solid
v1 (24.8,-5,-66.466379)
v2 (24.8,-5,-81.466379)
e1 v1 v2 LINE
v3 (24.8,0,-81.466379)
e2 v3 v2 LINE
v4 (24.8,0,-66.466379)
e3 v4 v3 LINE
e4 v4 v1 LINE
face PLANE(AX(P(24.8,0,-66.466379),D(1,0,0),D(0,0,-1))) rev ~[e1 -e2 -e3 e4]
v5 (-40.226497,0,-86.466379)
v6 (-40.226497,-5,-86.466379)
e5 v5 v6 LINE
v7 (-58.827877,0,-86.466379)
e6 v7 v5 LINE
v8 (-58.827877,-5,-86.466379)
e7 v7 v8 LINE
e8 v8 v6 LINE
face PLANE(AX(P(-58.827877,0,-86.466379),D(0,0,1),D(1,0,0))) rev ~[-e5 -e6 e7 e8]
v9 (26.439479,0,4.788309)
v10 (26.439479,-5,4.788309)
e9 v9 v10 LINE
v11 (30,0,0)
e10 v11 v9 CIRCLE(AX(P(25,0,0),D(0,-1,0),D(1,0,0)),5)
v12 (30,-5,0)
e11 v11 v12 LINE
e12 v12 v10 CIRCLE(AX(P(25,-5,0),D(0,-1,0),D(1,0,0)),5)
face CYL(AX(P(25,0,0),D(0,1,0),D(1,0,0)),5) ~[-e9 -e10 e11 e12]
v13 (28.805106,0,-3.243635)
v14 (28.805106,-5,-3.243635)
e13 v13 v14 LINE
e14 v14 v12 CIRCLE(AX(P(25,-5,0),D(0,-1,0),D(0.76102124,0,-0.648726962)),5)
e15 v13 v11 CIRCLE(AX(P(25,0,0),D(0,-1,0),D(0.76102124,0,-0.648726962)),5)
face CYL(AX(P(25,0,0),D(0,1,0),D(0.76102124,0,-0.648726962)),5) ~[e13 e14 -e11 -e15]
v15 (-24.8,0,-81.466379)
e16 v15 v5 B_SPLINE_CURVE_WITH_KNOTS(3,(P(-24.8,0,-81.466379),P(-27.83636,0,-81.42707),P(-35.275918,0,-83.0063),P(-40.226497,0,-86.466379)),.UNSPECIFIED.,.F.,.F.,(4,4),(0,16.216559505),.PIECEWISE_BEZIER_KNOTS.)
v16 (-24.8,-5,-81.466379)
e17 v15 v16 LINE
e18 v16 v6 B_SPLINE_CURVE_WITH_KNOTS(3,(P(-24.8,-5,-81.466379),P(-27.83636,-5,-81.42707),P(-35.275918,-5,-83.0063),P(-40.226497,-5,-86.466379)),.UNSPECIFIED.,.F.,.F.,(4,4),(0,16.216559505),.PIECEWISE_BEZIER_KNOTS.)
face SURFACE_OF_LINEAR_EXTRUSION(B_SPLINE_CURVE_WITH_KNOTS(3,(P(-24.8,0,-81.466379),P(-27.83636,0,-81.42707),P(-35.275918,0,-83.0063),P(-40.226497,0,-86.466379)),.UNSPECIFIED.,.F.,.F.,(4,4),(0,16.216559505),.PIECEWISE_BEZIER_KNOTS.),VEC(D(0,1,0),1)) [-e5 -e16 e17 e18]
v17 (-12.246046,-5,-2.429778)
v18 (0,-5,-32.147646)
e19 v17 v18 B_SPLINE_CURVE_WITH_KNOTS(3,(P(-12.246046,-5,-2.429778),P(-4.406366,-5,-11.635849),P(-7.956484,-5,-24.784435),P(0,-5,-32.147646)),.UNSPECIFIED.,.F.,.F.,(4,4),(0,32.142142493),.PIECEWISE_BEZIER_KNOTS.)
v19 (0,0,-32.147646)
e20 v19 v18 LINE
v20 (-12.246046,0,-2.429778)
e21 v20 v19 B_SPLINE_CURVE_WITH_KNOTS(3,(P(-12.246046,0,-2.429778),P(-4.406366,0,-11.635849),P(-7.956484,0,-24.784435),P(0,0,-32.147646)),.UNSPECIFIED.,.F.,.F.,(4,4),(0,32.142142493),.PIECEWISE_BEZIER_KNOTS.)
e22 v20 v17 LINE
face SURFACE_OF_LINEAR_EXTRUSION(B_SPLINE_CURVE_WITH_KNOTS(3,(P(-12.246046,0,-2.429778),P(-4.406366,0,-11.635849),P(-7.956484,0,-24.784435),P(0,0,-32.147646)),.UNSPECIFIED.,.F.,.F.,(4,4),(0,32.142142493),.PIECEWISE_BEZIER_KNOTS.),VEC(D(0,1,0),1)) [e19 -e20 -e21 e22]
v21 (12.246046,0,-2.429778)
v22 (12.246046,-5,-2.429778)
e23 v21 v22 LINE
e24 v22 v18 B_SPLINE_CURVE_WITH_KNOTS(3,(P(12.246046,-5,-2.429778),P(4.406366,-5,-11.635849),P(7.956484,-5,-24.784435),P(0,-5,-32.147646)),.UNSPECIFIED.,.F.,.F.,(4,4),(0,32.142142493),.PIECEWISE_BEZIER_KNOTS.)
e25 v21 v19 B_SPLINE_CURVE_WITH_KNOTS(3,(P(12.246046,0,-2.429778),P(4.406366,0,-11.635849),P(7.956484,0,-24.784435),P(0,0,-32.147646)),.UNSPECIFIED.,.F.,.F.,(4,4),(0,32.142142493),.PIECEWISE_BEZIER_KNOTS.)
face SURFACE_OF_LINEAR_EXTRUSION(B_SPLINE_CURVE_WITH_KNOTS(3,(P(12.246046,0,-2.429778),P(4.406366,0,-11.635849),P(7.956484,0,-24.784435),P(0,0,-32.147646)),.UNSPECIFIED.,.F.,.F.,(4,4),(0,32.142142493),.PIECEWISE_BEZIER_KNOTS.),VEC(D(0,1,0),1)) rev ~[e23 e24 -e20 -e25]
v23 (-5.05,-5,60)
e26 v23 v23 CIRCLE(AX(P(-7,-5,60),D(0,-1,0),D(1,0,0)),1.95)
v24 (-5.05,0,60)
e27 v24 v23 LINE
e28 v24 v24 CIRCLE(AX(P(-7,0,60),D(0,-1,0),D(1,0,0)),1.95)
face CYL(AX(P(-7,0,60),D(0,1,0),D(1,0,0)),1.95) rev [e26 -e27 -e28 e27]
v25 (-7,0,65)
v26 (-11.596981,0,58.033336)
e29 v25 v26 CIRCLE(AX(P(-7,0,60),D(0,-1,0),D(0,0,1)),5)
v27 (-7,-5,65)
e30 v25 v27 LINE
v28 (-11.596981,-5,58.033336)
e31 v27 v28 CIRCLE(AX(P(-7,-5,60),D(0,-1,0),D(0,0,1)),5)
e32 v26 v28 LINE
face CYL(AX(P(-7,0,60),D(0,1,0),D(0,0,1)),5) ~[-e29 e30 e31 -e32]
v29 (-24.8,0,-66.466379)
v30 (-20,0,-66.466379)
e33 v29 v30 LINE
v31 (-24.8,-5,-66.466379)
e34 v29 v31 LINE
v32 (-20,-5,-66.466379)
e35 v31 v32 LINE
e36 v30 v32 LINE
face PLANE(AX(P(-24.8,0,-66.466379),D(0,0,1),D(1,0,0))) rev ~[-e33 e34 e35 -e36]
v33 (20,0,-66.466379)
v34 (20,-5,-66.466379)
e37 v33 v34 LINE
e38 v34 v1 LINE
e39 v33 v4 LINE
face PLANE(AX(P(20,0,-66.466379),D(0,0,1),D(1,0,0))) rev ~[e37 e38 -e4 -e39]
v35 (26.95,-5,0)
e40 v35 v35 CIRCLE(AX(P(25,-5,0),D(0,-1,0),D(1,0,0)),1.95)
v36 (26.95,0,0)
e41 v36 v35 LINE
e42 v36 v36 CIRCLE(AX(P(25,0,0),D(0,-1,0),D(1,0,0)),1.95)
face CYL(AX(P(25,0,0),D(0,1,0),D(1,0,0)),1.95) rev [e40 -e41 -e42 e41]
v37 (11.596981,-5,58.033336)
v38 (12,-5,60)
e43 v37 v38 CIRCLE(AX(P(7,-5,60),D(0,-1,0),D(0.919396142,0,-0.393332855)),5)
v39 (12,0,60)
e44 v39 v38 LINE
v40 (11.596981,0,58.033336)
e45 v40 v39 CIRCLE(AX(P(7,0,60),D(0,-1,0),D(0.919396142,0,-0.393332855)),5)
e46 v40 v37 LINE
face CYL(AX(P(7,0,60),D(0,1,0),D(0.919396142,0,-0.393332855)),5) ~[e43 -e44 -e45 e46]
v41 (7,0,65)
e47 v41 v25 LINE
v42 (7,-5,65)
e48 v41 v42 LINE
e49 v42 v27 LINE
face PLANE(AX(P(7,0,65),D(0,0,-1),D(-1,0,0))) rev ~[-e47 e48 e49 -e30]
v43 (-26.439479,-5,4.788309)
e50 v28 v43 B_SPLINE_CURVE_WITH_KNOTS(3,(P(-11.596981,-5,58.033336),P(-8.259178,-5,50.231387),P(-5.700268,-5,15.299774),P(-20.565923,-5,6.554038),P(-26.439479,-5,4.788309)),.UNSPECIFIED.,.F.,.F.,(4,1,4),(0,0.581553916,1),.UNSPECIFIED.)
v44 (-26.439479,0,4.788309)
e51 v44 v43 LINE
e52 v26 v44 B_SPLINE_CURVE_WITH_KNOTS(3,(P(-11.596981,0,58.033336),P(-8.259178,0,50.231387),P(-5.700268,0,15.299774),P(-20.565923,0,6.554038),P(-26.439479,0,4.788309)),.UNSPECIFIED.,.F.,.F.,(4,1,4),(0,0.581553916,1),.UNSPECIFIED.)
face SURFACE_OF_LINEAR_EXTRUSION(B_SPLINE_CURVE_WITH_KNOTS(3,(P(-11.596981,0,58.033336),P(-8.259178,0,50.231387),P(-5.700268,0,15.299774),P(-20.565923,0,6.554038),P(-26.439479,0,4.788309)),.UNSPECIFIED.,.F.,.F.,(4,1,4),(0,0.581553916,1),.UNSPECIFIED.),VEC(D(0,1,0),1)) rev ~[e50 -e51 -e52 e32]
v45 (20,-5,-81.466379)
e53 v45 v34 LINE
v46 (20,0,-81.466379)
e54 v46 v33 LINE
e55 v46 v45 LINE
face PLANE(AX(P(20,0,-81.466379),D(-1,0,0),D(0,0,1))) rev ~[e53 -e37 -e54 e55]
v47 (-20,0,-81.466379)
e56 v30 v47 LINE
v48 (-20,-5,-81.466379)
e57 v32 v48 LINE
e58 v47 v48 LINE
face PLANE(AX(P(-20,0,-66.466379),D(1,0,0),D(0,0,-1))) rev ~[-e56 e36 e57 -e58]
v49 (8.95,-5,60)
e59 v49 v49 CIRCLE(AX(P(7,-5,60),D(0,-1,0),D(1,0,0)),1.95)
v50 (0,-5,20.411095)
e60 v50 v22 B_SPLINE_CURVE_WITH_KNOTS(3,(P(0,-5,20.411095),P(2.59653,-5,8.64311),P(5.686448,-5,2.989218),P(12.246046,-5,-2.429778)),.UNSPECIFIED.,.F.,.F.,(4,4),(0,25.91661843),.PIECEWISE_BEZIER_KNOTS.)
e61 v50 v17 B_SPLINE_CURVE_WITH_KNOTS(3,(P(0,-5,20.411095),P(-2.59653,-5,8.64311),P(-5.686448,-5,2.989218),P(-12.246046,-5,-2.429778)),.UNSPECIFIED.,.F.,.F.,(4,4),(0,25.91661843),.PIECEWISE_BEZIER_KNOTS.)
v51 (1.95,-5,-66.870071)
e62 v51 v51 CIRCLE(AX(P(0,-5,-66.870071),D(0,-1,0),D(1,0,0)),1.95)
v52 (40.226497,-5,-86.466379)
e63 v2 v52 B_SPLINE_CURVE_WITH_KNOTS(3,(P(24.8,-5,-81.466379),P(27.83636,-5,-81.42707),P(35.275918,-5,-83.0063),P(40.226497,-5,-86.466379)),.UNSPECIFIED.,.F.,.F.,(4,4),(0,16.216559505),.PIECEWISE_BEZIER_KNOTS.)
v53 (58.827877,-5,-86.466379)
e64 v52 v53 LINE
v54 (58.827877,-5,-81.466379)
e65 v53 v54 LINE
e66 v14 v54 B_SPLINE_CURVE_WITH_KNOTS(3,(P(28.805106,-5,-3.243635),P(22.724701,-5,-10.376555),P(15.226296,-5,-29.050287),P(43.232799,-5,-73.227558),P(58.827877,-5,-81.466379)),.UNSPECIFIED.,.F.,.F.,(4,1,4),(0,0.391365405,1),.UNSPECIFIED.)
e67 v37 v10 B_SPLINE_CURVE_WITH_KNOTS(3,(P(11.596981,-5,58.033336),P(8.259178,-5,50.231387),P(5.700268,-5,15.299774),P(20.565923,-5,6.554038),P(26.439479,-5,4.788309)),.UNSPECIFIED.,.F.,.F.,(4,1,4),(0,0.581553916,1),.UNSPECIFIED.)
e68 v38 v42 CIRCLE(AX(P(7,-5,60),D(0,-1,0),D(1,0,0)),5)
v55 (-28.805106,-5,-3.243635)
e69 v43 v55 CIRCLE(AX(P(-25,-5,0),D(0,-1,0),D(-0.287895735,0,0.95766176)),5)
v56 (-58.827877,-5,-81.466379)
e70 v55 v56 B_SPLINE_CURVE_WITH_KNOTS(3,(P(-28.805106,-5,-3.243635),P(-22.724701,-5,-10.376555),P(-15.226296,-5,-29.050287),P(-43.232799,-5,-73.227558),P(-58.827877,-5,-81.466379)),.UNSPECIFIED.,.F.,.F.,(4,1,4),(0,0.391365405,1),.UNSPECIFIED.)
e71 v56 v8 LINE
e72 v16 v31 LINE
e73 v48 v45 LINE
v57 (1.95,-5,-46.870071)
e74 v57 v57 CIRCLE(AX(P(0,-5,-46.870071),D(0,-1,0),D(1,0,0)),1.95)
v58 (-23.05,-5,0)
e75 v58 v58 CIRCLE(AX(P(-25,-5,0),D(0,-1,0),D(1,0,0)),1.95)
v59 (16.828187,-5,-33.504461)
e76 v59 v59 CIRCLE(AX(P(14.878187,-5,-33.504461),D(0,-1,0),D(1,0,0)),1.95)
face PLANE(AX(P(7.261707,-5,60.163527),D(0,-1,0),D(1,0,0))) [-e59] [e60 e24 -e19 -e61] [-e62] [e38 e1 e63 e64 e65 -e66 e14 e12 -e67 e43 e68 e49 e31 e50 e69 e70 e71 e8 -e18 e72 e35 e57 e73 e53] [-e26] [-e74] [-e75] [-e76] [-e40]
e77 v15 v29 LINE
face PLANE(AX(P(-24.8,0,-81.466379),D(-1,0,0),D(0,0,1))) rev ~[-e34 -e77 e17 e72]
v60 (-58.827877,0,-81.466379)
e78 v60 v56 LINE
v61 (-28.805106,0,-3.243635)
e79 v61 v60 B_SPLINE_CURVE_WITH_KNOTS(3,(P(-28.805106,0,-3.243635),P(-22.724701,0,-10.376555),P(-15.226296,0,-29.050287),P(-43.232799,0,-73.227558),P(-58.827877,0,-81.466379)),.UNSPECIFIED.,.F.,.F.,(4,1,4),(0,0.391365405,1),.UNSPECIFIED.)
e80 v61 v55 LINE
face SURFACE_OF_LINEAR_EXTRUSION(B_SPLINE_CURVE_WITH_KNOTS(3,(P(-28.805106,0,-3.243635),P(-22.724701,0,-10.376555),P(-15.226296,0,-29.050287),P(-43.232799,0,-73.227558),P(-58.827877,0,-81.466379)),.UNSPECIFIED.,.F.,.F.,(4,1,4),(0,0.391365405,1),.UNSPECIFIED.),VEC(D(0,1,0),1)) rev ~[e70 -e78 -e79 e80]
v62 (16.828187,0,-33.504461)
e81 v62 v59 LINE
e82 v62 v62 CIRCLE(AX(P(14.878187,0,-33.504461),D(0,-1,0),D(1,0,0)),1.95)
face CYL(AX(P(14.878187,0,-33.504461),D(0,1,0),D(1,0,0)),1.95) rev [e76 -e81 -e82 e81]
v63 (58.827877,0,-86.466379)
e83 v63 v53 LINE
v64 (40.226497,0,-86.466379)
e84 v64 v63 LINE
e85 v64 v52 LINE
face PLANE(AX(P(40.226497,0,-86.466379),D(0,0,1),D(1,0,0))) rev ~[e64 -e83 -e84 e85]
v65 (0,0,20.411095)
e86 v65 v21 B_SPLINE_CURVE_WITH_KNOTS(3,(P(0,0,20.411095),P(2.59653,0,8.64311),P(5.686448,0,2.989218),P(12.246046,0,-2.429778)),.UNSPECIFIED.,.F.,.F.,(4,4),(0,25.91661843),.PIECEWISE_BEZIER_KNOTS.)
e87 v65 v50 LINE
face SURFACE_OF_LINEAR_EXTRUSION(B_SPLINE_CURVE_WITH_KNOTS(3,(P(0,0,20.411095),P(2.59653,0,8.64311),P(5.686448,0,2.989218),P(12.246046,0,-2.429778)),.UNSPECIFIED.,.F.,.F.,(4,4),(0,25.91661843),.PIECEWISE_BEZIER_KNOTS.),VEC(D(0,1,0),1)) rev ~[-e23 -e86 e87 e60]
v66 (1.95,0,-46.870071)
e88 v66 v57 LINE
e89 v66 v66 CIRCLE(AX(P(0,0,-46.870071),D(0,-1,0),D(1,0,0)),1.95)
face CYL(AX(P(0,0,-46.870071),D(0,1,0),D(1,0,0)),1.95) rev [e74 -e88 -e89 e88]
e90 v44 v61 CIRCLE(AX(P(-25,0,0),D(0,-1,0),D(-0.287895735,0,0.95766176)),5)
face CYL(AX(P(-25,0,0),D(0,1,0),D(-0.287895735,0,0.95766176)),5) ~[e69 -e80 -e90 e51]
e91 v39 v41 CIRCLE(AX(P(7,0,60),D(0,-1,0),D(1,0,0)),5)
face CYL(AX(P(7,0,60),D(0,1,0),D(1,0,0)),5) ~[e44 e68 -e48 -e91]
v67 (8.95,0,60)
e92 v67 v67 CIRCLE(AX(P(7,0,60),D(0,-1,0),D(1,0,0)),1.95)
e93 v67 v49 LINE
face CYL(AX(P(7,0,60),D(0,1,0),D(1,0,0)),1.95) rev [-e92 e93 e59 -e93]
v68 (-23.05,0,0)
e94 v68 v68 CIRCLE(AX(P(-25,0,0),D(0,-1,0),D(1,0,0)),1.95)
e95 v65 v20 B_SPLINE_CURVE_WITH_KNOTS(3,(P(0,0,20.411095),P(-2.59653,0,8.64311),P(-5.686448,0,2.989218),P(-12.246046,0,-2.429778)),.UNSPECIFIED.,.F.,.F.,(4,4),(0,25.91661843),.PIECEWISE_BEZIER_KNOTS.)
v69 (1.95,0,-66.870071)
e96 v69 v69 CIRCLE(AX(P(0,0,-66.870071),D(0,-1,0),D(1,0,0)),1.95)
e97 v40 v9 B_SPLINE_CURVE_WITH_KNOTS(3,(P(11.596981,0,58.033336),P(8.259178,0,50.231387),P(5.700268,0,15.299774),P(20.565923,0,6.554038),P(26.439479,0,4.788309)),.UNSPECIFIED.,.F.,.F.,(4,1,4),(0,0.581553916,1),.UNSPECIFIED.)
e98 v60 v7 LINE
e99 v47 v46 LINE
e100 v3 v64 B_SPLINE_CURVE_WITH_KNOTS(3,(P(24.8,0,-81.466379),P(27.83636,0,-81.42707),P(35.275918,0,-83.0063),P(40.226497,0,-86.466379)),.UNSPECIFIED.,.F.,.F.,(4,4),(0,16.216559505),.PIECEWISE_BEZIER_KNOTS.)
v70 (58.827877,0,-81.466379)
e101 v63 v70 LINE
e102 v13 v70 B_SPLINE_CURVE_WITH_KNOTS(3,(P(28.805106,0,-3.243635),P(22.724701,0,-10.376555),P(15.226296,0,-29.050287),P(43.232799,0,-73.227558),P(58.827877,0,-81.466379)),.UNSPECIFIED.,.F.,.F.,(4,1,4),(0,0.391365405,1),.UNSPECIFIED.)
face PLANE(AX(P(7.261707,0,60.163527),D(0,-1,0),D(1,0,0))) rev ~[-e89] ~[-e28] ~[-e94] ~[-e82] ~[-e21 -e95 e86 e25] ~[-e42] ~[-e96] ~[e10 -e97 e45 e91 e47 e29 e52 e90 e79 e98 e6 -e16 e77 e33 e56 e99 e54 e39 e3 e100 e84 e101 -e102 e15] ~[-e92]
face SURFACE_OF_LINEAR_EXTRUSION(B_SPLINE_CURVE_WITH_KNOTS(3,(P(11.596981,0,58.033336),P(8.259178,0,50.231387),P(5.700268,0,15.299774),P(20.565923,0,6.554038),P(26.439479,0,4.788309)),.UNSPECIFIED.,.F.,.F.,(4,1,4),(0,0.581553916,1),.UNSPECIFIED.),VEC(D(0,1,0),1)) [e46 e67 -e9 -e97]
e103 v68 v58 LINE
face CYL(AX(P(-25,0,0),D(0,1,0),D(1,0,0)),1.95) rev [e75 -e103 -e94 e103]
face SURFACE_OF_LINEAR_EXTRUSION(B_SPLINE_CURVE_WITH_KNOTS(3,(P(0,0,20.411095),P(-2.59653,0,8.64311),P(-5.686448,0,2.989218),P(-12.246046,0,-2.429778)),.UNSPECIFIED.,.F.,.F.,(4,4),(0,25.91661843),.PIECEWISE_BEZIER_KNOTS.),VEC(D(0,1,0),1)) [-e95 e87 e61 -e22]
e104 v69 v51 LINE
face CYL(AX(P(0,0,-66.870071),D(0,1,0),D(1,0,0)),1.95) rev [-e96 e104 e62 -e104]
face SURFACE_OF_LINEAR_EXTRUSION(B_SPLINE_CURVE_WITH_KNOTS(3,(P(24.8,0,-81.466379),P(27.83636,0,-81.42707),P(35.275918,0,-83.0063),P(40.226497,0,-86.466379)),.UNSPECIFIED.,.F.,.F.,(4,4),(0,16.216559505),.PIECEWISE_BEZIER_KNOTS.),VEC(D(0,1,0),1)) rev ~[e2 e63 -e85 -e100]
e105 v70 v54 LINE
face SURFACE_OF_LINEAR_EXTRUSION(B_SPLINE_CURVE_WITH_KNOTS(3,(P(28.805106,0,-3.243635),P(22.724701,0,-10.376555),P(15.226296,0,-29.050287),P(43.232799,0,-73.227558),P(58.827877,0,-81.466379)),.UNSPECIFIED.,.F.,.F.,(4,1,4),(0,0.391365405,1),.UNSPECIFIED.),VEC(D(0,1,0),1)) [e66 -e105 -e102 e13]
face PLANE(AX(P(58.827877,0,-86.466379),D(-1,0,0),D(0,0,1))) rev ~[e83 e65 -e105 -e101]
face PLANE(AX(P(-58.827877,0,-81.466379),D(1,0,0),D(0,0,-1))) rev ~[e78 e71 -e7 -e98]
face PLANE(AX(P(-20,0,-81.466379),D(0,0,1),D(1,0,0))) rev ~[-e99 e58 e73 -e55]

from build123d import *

# Parameters (mm, degrees)
F0_R     = 1.95
F1_DEPTH = 5


with BuildPart() as f1:
    # F0 (on Front) → F1 (new body)
    with BuildSketch(Plane.XZ):
        with BuildLine():
            ThreePointArc((11.5969807084, 58.0333357261), (11.8982090371, 58.9962329808), (12, 60))
            ThreePointArc((12, 60), (10.5355339059, 63.5355339059), (7, 65))
            ThreePointArc((7, 65), (2.8266727082, 57.2462136402), (11.5969807084, 58.0333357261))
        make_face()
        with Locations((7, 60)):
            Circle(F0_R, mode=Mode.SUBTRACT)
        with BuildLine():
            ThreePointArc((11.5969807084, 58.0333357261), (2.8266727082, 57.2462136402), (7, 65))
            Line((7, 65), (0, 65))
            Line((0, 65), (-7, 65))
            ThreePointArc((-7, 65), (-3.4644660941, 63.5355339059), (-2, 60))
            ThreePointArc((-2, 60), (-5.9962329808, 55.1017909629), (-11.5969807084, 58.0333357261))
            add(Edge.make_bspline(
                [(-11.5969807084, 58.0333357261), (-8.259178384, 50.2313874739), (-5.7002681923, 15.299773588), (-20.5659226075, 6.5540384245), (-26.4394786751, 4.7883087979)],
                knots=[0, 0, 0, 0, 0.5815539161, 1, 1, 1, 1], degree=3))
            ThreePointArc((-26.4394786751, 4.7883087979), (-22.0164947943, 4.0123181189), (-20, 0))
            ThreePointArc((-20, 0), (-23.271638205, -4.69177637), (-28.8051062023, -3.2436348113))
            add(Edge.make_bspline(
                [(-28.8051062023, -3.2436348113), (-22.7247010924, -10.376554681), (-15.2262960098, -29.050287314), (-43.232798529, -73.227558015), (-58.8278773565, -81.4663794637)],
                knots=[0, 0, 0, 0, 0.3913654049, 1, 1, 1, 1], degree=3))
            Line((-58.8278773565, -81.4663794637), (-58.8278773565, -86.4663794637))
            Line((-58.8278773565, -86.4663794637), (-40.2264967561, -86.4663794637))
            add(Edge.make_bspline(
                [(-24.8, -81.4663794637), (-27.8363596976, -81.4270702004), (-35.2759175003, -83.0063000321), (-40.2264967561, -86.4663794637)],
                knots=[0, 0, 0, 0, 16.2165595046, 16.2165595046, 16.2165595046, 16.2165595046], degree=3))
            Line((-24.8, -81.4663794637), (-24.8, -66.4663794637))
            Line((-24.8, -66.4663794637), (-20, -66.4663794637))
            Line((-20, -66.4663794637), (-20, -81.4663794637))
            Line((-20, -81.4663794637), (0, -81.4663794637))
            Line((0, -81.4663794637), (20, -81.4663794637))
            Line((20, -81.4663794637), (20, -66.4663794637))
            Line((20, -66.4663794637), (24.8, -66.4663794637))
            Line((24.8, -66.4663794637), (24.8, -81.4663794637))
            add(Edge.make_bspline(
                [(24.8, -81.4663794637), (27.8363596976, -81.4270702004), (35.2759175003, -83.0063000321), (40.2264967561, -86.4663794637)],
                knots=[0, 0, 0, 0, 16.2165595046, 16.2165595046, 16.2165595046, 16.2165595046], degree=3))
            Line((40.2264967561, -86.4663794637), (58.8278773565, -86.4663794637))
            Line((58.8278773565, -86.4663794637), (58.8278773565, -81.4663794637))
            add(Edge.make_bspline(
                [(28.8051062023, -3.2436348113), (22.7247010924, -10.376554681), (15.2262960098, -29.050287314), (43.232798529, -73.227558015), (58.8278773565, -81.4663794637)],
                knots=[0, 0, 0, 0, 0.3913654049, 1, 1, 1, 1], degree=3))
            ThreePointArc((28.8051062023, -3.2436348113), (20.2037048496, -1.4126403755), (26.4394786751, 4.7883087979))
            add(Edge.make_bspline(
                [(11.5969807084, 58.0333357261), (8.259178384, 50.2313874739), (5.7002681923, 15.299773588), (20.5659226075, 6.5540384245), (26.4394786751, 4.7883087979)],
                knots=[0, 0, 0, 0, 0.5815539161, 1, 1, 1, 1], degree=3))
        make_face()
        with Locations((0, -66.8700714409)):
            Circle(F0_R, mode=Mode.SUBTRACT)
        with Locations((0, -46.8700714409)):
            Circle(F0_R, mode=Mode.SUBTRACT)
        with Locations((14.8781873236, -33.5044610186)):
            Circle(F0_R, mode=Mode.SUBTRACT)
        with BuildLine():
            add(Edge.make_bspline(
                [(0, 20.4110946506), (-2.5965298992, 8.6431102827), (-5.6864479557, 2.9892178718), (-12.2460462153, -2.4297779892)],
                knots=[0, 0, 0, 0, 25.9166184302, 25.9166184302, 25.9166184302, 25.9166184302], degree=3))
            add(Edge.make_bspline(
                [(0, 20.4110946506), (2.5965298992, 8.6431102827), (5.6864479557, 2.9892178718), (12.2460462153, -2.4297779892)],
                knots=[0, 0, 0, 0, 25.9166184302, 25.9166184302, 25.9166184302, 25.9166184302], degree=3))
            add(Edge.make_bspline(
                [(12.2460462153, -2.4297779892), (4.406365566, -11.6358492523), (7.9564843327, -24.7844345868), (0, -32.1476459503)],
                knots=[0, 0, 0, 0, 32.1421424934, 32.1421424934, 32.1421424934, 32.1421424934], degree=3))
            add(Edge.make_bspline(
                [(-12.2460462153, -2.4297779892), (-4.406365566, -11.6358492523), (-7.9564843327, -24.7844345868), (0, -32.1476459503)],
                knots=[0, 0, 0, 0, 32.1421424934, 32.1421424934, 32.1421424934, 32.1421424934], degree=3))
        make_face(mode=Mode.SUBTRACT)
        with BuildLine():
            ThreePointArc((30, 0), (29.0123181189, 2.9835052057), (26.4394786751, 4.7883087979))
            ThreePointArc((26.4394786751, 4.7883087979), (20.2037048496, -1.4126403755), (28.8051062023, -3.2436348113))
            ThreePointArc((28.8051062023, -3.2436348113), (29.69177637, -1.728361795), (30, 0))
        make_face()
        with Locations((25, 0)):
            Circle(F0_R, mode=Mode.SUBTRACT)
        with BuildLine():
            ThreePointArc((-2, 60), (-3.4644660941, 63.5355339059), (-7, 65))
            ThreePointArc((-7, 65), (-11.1733272918, 62.7537863598), (-11.5969807084, 58.0333357261))
            ThreePointArc((-11.5969807084, 58.0333357261), (-5.9962329808, 55.1017909629), (-2, 60))
        make_face()
        with Locations((-7, 60)):
            Circle(F0_R, mode=Mode.SUBTRACT)
        with BuildLine():
            ThreePointArc((-20, 0), (-22.0164947943, 4.0123181189), (-26.4394786751, 4.7883087979))
            ThreePointArc((-26.4394786751, 4.7883087979), (-29.7962951504, 1.4126403755), (-28.8051062023, -3.2436348113))
            ThreePointArc((-28.8051062023, -3.2436348113), (-23.271638205, -4.69177637), (-20, 0))
        make_face()
        with Locations((-25, 0)):
            Circle(F0_R, mode=Mode.SUBTRACT)
    extrude(amount=F1_DEPTH)


solid = f1.part
